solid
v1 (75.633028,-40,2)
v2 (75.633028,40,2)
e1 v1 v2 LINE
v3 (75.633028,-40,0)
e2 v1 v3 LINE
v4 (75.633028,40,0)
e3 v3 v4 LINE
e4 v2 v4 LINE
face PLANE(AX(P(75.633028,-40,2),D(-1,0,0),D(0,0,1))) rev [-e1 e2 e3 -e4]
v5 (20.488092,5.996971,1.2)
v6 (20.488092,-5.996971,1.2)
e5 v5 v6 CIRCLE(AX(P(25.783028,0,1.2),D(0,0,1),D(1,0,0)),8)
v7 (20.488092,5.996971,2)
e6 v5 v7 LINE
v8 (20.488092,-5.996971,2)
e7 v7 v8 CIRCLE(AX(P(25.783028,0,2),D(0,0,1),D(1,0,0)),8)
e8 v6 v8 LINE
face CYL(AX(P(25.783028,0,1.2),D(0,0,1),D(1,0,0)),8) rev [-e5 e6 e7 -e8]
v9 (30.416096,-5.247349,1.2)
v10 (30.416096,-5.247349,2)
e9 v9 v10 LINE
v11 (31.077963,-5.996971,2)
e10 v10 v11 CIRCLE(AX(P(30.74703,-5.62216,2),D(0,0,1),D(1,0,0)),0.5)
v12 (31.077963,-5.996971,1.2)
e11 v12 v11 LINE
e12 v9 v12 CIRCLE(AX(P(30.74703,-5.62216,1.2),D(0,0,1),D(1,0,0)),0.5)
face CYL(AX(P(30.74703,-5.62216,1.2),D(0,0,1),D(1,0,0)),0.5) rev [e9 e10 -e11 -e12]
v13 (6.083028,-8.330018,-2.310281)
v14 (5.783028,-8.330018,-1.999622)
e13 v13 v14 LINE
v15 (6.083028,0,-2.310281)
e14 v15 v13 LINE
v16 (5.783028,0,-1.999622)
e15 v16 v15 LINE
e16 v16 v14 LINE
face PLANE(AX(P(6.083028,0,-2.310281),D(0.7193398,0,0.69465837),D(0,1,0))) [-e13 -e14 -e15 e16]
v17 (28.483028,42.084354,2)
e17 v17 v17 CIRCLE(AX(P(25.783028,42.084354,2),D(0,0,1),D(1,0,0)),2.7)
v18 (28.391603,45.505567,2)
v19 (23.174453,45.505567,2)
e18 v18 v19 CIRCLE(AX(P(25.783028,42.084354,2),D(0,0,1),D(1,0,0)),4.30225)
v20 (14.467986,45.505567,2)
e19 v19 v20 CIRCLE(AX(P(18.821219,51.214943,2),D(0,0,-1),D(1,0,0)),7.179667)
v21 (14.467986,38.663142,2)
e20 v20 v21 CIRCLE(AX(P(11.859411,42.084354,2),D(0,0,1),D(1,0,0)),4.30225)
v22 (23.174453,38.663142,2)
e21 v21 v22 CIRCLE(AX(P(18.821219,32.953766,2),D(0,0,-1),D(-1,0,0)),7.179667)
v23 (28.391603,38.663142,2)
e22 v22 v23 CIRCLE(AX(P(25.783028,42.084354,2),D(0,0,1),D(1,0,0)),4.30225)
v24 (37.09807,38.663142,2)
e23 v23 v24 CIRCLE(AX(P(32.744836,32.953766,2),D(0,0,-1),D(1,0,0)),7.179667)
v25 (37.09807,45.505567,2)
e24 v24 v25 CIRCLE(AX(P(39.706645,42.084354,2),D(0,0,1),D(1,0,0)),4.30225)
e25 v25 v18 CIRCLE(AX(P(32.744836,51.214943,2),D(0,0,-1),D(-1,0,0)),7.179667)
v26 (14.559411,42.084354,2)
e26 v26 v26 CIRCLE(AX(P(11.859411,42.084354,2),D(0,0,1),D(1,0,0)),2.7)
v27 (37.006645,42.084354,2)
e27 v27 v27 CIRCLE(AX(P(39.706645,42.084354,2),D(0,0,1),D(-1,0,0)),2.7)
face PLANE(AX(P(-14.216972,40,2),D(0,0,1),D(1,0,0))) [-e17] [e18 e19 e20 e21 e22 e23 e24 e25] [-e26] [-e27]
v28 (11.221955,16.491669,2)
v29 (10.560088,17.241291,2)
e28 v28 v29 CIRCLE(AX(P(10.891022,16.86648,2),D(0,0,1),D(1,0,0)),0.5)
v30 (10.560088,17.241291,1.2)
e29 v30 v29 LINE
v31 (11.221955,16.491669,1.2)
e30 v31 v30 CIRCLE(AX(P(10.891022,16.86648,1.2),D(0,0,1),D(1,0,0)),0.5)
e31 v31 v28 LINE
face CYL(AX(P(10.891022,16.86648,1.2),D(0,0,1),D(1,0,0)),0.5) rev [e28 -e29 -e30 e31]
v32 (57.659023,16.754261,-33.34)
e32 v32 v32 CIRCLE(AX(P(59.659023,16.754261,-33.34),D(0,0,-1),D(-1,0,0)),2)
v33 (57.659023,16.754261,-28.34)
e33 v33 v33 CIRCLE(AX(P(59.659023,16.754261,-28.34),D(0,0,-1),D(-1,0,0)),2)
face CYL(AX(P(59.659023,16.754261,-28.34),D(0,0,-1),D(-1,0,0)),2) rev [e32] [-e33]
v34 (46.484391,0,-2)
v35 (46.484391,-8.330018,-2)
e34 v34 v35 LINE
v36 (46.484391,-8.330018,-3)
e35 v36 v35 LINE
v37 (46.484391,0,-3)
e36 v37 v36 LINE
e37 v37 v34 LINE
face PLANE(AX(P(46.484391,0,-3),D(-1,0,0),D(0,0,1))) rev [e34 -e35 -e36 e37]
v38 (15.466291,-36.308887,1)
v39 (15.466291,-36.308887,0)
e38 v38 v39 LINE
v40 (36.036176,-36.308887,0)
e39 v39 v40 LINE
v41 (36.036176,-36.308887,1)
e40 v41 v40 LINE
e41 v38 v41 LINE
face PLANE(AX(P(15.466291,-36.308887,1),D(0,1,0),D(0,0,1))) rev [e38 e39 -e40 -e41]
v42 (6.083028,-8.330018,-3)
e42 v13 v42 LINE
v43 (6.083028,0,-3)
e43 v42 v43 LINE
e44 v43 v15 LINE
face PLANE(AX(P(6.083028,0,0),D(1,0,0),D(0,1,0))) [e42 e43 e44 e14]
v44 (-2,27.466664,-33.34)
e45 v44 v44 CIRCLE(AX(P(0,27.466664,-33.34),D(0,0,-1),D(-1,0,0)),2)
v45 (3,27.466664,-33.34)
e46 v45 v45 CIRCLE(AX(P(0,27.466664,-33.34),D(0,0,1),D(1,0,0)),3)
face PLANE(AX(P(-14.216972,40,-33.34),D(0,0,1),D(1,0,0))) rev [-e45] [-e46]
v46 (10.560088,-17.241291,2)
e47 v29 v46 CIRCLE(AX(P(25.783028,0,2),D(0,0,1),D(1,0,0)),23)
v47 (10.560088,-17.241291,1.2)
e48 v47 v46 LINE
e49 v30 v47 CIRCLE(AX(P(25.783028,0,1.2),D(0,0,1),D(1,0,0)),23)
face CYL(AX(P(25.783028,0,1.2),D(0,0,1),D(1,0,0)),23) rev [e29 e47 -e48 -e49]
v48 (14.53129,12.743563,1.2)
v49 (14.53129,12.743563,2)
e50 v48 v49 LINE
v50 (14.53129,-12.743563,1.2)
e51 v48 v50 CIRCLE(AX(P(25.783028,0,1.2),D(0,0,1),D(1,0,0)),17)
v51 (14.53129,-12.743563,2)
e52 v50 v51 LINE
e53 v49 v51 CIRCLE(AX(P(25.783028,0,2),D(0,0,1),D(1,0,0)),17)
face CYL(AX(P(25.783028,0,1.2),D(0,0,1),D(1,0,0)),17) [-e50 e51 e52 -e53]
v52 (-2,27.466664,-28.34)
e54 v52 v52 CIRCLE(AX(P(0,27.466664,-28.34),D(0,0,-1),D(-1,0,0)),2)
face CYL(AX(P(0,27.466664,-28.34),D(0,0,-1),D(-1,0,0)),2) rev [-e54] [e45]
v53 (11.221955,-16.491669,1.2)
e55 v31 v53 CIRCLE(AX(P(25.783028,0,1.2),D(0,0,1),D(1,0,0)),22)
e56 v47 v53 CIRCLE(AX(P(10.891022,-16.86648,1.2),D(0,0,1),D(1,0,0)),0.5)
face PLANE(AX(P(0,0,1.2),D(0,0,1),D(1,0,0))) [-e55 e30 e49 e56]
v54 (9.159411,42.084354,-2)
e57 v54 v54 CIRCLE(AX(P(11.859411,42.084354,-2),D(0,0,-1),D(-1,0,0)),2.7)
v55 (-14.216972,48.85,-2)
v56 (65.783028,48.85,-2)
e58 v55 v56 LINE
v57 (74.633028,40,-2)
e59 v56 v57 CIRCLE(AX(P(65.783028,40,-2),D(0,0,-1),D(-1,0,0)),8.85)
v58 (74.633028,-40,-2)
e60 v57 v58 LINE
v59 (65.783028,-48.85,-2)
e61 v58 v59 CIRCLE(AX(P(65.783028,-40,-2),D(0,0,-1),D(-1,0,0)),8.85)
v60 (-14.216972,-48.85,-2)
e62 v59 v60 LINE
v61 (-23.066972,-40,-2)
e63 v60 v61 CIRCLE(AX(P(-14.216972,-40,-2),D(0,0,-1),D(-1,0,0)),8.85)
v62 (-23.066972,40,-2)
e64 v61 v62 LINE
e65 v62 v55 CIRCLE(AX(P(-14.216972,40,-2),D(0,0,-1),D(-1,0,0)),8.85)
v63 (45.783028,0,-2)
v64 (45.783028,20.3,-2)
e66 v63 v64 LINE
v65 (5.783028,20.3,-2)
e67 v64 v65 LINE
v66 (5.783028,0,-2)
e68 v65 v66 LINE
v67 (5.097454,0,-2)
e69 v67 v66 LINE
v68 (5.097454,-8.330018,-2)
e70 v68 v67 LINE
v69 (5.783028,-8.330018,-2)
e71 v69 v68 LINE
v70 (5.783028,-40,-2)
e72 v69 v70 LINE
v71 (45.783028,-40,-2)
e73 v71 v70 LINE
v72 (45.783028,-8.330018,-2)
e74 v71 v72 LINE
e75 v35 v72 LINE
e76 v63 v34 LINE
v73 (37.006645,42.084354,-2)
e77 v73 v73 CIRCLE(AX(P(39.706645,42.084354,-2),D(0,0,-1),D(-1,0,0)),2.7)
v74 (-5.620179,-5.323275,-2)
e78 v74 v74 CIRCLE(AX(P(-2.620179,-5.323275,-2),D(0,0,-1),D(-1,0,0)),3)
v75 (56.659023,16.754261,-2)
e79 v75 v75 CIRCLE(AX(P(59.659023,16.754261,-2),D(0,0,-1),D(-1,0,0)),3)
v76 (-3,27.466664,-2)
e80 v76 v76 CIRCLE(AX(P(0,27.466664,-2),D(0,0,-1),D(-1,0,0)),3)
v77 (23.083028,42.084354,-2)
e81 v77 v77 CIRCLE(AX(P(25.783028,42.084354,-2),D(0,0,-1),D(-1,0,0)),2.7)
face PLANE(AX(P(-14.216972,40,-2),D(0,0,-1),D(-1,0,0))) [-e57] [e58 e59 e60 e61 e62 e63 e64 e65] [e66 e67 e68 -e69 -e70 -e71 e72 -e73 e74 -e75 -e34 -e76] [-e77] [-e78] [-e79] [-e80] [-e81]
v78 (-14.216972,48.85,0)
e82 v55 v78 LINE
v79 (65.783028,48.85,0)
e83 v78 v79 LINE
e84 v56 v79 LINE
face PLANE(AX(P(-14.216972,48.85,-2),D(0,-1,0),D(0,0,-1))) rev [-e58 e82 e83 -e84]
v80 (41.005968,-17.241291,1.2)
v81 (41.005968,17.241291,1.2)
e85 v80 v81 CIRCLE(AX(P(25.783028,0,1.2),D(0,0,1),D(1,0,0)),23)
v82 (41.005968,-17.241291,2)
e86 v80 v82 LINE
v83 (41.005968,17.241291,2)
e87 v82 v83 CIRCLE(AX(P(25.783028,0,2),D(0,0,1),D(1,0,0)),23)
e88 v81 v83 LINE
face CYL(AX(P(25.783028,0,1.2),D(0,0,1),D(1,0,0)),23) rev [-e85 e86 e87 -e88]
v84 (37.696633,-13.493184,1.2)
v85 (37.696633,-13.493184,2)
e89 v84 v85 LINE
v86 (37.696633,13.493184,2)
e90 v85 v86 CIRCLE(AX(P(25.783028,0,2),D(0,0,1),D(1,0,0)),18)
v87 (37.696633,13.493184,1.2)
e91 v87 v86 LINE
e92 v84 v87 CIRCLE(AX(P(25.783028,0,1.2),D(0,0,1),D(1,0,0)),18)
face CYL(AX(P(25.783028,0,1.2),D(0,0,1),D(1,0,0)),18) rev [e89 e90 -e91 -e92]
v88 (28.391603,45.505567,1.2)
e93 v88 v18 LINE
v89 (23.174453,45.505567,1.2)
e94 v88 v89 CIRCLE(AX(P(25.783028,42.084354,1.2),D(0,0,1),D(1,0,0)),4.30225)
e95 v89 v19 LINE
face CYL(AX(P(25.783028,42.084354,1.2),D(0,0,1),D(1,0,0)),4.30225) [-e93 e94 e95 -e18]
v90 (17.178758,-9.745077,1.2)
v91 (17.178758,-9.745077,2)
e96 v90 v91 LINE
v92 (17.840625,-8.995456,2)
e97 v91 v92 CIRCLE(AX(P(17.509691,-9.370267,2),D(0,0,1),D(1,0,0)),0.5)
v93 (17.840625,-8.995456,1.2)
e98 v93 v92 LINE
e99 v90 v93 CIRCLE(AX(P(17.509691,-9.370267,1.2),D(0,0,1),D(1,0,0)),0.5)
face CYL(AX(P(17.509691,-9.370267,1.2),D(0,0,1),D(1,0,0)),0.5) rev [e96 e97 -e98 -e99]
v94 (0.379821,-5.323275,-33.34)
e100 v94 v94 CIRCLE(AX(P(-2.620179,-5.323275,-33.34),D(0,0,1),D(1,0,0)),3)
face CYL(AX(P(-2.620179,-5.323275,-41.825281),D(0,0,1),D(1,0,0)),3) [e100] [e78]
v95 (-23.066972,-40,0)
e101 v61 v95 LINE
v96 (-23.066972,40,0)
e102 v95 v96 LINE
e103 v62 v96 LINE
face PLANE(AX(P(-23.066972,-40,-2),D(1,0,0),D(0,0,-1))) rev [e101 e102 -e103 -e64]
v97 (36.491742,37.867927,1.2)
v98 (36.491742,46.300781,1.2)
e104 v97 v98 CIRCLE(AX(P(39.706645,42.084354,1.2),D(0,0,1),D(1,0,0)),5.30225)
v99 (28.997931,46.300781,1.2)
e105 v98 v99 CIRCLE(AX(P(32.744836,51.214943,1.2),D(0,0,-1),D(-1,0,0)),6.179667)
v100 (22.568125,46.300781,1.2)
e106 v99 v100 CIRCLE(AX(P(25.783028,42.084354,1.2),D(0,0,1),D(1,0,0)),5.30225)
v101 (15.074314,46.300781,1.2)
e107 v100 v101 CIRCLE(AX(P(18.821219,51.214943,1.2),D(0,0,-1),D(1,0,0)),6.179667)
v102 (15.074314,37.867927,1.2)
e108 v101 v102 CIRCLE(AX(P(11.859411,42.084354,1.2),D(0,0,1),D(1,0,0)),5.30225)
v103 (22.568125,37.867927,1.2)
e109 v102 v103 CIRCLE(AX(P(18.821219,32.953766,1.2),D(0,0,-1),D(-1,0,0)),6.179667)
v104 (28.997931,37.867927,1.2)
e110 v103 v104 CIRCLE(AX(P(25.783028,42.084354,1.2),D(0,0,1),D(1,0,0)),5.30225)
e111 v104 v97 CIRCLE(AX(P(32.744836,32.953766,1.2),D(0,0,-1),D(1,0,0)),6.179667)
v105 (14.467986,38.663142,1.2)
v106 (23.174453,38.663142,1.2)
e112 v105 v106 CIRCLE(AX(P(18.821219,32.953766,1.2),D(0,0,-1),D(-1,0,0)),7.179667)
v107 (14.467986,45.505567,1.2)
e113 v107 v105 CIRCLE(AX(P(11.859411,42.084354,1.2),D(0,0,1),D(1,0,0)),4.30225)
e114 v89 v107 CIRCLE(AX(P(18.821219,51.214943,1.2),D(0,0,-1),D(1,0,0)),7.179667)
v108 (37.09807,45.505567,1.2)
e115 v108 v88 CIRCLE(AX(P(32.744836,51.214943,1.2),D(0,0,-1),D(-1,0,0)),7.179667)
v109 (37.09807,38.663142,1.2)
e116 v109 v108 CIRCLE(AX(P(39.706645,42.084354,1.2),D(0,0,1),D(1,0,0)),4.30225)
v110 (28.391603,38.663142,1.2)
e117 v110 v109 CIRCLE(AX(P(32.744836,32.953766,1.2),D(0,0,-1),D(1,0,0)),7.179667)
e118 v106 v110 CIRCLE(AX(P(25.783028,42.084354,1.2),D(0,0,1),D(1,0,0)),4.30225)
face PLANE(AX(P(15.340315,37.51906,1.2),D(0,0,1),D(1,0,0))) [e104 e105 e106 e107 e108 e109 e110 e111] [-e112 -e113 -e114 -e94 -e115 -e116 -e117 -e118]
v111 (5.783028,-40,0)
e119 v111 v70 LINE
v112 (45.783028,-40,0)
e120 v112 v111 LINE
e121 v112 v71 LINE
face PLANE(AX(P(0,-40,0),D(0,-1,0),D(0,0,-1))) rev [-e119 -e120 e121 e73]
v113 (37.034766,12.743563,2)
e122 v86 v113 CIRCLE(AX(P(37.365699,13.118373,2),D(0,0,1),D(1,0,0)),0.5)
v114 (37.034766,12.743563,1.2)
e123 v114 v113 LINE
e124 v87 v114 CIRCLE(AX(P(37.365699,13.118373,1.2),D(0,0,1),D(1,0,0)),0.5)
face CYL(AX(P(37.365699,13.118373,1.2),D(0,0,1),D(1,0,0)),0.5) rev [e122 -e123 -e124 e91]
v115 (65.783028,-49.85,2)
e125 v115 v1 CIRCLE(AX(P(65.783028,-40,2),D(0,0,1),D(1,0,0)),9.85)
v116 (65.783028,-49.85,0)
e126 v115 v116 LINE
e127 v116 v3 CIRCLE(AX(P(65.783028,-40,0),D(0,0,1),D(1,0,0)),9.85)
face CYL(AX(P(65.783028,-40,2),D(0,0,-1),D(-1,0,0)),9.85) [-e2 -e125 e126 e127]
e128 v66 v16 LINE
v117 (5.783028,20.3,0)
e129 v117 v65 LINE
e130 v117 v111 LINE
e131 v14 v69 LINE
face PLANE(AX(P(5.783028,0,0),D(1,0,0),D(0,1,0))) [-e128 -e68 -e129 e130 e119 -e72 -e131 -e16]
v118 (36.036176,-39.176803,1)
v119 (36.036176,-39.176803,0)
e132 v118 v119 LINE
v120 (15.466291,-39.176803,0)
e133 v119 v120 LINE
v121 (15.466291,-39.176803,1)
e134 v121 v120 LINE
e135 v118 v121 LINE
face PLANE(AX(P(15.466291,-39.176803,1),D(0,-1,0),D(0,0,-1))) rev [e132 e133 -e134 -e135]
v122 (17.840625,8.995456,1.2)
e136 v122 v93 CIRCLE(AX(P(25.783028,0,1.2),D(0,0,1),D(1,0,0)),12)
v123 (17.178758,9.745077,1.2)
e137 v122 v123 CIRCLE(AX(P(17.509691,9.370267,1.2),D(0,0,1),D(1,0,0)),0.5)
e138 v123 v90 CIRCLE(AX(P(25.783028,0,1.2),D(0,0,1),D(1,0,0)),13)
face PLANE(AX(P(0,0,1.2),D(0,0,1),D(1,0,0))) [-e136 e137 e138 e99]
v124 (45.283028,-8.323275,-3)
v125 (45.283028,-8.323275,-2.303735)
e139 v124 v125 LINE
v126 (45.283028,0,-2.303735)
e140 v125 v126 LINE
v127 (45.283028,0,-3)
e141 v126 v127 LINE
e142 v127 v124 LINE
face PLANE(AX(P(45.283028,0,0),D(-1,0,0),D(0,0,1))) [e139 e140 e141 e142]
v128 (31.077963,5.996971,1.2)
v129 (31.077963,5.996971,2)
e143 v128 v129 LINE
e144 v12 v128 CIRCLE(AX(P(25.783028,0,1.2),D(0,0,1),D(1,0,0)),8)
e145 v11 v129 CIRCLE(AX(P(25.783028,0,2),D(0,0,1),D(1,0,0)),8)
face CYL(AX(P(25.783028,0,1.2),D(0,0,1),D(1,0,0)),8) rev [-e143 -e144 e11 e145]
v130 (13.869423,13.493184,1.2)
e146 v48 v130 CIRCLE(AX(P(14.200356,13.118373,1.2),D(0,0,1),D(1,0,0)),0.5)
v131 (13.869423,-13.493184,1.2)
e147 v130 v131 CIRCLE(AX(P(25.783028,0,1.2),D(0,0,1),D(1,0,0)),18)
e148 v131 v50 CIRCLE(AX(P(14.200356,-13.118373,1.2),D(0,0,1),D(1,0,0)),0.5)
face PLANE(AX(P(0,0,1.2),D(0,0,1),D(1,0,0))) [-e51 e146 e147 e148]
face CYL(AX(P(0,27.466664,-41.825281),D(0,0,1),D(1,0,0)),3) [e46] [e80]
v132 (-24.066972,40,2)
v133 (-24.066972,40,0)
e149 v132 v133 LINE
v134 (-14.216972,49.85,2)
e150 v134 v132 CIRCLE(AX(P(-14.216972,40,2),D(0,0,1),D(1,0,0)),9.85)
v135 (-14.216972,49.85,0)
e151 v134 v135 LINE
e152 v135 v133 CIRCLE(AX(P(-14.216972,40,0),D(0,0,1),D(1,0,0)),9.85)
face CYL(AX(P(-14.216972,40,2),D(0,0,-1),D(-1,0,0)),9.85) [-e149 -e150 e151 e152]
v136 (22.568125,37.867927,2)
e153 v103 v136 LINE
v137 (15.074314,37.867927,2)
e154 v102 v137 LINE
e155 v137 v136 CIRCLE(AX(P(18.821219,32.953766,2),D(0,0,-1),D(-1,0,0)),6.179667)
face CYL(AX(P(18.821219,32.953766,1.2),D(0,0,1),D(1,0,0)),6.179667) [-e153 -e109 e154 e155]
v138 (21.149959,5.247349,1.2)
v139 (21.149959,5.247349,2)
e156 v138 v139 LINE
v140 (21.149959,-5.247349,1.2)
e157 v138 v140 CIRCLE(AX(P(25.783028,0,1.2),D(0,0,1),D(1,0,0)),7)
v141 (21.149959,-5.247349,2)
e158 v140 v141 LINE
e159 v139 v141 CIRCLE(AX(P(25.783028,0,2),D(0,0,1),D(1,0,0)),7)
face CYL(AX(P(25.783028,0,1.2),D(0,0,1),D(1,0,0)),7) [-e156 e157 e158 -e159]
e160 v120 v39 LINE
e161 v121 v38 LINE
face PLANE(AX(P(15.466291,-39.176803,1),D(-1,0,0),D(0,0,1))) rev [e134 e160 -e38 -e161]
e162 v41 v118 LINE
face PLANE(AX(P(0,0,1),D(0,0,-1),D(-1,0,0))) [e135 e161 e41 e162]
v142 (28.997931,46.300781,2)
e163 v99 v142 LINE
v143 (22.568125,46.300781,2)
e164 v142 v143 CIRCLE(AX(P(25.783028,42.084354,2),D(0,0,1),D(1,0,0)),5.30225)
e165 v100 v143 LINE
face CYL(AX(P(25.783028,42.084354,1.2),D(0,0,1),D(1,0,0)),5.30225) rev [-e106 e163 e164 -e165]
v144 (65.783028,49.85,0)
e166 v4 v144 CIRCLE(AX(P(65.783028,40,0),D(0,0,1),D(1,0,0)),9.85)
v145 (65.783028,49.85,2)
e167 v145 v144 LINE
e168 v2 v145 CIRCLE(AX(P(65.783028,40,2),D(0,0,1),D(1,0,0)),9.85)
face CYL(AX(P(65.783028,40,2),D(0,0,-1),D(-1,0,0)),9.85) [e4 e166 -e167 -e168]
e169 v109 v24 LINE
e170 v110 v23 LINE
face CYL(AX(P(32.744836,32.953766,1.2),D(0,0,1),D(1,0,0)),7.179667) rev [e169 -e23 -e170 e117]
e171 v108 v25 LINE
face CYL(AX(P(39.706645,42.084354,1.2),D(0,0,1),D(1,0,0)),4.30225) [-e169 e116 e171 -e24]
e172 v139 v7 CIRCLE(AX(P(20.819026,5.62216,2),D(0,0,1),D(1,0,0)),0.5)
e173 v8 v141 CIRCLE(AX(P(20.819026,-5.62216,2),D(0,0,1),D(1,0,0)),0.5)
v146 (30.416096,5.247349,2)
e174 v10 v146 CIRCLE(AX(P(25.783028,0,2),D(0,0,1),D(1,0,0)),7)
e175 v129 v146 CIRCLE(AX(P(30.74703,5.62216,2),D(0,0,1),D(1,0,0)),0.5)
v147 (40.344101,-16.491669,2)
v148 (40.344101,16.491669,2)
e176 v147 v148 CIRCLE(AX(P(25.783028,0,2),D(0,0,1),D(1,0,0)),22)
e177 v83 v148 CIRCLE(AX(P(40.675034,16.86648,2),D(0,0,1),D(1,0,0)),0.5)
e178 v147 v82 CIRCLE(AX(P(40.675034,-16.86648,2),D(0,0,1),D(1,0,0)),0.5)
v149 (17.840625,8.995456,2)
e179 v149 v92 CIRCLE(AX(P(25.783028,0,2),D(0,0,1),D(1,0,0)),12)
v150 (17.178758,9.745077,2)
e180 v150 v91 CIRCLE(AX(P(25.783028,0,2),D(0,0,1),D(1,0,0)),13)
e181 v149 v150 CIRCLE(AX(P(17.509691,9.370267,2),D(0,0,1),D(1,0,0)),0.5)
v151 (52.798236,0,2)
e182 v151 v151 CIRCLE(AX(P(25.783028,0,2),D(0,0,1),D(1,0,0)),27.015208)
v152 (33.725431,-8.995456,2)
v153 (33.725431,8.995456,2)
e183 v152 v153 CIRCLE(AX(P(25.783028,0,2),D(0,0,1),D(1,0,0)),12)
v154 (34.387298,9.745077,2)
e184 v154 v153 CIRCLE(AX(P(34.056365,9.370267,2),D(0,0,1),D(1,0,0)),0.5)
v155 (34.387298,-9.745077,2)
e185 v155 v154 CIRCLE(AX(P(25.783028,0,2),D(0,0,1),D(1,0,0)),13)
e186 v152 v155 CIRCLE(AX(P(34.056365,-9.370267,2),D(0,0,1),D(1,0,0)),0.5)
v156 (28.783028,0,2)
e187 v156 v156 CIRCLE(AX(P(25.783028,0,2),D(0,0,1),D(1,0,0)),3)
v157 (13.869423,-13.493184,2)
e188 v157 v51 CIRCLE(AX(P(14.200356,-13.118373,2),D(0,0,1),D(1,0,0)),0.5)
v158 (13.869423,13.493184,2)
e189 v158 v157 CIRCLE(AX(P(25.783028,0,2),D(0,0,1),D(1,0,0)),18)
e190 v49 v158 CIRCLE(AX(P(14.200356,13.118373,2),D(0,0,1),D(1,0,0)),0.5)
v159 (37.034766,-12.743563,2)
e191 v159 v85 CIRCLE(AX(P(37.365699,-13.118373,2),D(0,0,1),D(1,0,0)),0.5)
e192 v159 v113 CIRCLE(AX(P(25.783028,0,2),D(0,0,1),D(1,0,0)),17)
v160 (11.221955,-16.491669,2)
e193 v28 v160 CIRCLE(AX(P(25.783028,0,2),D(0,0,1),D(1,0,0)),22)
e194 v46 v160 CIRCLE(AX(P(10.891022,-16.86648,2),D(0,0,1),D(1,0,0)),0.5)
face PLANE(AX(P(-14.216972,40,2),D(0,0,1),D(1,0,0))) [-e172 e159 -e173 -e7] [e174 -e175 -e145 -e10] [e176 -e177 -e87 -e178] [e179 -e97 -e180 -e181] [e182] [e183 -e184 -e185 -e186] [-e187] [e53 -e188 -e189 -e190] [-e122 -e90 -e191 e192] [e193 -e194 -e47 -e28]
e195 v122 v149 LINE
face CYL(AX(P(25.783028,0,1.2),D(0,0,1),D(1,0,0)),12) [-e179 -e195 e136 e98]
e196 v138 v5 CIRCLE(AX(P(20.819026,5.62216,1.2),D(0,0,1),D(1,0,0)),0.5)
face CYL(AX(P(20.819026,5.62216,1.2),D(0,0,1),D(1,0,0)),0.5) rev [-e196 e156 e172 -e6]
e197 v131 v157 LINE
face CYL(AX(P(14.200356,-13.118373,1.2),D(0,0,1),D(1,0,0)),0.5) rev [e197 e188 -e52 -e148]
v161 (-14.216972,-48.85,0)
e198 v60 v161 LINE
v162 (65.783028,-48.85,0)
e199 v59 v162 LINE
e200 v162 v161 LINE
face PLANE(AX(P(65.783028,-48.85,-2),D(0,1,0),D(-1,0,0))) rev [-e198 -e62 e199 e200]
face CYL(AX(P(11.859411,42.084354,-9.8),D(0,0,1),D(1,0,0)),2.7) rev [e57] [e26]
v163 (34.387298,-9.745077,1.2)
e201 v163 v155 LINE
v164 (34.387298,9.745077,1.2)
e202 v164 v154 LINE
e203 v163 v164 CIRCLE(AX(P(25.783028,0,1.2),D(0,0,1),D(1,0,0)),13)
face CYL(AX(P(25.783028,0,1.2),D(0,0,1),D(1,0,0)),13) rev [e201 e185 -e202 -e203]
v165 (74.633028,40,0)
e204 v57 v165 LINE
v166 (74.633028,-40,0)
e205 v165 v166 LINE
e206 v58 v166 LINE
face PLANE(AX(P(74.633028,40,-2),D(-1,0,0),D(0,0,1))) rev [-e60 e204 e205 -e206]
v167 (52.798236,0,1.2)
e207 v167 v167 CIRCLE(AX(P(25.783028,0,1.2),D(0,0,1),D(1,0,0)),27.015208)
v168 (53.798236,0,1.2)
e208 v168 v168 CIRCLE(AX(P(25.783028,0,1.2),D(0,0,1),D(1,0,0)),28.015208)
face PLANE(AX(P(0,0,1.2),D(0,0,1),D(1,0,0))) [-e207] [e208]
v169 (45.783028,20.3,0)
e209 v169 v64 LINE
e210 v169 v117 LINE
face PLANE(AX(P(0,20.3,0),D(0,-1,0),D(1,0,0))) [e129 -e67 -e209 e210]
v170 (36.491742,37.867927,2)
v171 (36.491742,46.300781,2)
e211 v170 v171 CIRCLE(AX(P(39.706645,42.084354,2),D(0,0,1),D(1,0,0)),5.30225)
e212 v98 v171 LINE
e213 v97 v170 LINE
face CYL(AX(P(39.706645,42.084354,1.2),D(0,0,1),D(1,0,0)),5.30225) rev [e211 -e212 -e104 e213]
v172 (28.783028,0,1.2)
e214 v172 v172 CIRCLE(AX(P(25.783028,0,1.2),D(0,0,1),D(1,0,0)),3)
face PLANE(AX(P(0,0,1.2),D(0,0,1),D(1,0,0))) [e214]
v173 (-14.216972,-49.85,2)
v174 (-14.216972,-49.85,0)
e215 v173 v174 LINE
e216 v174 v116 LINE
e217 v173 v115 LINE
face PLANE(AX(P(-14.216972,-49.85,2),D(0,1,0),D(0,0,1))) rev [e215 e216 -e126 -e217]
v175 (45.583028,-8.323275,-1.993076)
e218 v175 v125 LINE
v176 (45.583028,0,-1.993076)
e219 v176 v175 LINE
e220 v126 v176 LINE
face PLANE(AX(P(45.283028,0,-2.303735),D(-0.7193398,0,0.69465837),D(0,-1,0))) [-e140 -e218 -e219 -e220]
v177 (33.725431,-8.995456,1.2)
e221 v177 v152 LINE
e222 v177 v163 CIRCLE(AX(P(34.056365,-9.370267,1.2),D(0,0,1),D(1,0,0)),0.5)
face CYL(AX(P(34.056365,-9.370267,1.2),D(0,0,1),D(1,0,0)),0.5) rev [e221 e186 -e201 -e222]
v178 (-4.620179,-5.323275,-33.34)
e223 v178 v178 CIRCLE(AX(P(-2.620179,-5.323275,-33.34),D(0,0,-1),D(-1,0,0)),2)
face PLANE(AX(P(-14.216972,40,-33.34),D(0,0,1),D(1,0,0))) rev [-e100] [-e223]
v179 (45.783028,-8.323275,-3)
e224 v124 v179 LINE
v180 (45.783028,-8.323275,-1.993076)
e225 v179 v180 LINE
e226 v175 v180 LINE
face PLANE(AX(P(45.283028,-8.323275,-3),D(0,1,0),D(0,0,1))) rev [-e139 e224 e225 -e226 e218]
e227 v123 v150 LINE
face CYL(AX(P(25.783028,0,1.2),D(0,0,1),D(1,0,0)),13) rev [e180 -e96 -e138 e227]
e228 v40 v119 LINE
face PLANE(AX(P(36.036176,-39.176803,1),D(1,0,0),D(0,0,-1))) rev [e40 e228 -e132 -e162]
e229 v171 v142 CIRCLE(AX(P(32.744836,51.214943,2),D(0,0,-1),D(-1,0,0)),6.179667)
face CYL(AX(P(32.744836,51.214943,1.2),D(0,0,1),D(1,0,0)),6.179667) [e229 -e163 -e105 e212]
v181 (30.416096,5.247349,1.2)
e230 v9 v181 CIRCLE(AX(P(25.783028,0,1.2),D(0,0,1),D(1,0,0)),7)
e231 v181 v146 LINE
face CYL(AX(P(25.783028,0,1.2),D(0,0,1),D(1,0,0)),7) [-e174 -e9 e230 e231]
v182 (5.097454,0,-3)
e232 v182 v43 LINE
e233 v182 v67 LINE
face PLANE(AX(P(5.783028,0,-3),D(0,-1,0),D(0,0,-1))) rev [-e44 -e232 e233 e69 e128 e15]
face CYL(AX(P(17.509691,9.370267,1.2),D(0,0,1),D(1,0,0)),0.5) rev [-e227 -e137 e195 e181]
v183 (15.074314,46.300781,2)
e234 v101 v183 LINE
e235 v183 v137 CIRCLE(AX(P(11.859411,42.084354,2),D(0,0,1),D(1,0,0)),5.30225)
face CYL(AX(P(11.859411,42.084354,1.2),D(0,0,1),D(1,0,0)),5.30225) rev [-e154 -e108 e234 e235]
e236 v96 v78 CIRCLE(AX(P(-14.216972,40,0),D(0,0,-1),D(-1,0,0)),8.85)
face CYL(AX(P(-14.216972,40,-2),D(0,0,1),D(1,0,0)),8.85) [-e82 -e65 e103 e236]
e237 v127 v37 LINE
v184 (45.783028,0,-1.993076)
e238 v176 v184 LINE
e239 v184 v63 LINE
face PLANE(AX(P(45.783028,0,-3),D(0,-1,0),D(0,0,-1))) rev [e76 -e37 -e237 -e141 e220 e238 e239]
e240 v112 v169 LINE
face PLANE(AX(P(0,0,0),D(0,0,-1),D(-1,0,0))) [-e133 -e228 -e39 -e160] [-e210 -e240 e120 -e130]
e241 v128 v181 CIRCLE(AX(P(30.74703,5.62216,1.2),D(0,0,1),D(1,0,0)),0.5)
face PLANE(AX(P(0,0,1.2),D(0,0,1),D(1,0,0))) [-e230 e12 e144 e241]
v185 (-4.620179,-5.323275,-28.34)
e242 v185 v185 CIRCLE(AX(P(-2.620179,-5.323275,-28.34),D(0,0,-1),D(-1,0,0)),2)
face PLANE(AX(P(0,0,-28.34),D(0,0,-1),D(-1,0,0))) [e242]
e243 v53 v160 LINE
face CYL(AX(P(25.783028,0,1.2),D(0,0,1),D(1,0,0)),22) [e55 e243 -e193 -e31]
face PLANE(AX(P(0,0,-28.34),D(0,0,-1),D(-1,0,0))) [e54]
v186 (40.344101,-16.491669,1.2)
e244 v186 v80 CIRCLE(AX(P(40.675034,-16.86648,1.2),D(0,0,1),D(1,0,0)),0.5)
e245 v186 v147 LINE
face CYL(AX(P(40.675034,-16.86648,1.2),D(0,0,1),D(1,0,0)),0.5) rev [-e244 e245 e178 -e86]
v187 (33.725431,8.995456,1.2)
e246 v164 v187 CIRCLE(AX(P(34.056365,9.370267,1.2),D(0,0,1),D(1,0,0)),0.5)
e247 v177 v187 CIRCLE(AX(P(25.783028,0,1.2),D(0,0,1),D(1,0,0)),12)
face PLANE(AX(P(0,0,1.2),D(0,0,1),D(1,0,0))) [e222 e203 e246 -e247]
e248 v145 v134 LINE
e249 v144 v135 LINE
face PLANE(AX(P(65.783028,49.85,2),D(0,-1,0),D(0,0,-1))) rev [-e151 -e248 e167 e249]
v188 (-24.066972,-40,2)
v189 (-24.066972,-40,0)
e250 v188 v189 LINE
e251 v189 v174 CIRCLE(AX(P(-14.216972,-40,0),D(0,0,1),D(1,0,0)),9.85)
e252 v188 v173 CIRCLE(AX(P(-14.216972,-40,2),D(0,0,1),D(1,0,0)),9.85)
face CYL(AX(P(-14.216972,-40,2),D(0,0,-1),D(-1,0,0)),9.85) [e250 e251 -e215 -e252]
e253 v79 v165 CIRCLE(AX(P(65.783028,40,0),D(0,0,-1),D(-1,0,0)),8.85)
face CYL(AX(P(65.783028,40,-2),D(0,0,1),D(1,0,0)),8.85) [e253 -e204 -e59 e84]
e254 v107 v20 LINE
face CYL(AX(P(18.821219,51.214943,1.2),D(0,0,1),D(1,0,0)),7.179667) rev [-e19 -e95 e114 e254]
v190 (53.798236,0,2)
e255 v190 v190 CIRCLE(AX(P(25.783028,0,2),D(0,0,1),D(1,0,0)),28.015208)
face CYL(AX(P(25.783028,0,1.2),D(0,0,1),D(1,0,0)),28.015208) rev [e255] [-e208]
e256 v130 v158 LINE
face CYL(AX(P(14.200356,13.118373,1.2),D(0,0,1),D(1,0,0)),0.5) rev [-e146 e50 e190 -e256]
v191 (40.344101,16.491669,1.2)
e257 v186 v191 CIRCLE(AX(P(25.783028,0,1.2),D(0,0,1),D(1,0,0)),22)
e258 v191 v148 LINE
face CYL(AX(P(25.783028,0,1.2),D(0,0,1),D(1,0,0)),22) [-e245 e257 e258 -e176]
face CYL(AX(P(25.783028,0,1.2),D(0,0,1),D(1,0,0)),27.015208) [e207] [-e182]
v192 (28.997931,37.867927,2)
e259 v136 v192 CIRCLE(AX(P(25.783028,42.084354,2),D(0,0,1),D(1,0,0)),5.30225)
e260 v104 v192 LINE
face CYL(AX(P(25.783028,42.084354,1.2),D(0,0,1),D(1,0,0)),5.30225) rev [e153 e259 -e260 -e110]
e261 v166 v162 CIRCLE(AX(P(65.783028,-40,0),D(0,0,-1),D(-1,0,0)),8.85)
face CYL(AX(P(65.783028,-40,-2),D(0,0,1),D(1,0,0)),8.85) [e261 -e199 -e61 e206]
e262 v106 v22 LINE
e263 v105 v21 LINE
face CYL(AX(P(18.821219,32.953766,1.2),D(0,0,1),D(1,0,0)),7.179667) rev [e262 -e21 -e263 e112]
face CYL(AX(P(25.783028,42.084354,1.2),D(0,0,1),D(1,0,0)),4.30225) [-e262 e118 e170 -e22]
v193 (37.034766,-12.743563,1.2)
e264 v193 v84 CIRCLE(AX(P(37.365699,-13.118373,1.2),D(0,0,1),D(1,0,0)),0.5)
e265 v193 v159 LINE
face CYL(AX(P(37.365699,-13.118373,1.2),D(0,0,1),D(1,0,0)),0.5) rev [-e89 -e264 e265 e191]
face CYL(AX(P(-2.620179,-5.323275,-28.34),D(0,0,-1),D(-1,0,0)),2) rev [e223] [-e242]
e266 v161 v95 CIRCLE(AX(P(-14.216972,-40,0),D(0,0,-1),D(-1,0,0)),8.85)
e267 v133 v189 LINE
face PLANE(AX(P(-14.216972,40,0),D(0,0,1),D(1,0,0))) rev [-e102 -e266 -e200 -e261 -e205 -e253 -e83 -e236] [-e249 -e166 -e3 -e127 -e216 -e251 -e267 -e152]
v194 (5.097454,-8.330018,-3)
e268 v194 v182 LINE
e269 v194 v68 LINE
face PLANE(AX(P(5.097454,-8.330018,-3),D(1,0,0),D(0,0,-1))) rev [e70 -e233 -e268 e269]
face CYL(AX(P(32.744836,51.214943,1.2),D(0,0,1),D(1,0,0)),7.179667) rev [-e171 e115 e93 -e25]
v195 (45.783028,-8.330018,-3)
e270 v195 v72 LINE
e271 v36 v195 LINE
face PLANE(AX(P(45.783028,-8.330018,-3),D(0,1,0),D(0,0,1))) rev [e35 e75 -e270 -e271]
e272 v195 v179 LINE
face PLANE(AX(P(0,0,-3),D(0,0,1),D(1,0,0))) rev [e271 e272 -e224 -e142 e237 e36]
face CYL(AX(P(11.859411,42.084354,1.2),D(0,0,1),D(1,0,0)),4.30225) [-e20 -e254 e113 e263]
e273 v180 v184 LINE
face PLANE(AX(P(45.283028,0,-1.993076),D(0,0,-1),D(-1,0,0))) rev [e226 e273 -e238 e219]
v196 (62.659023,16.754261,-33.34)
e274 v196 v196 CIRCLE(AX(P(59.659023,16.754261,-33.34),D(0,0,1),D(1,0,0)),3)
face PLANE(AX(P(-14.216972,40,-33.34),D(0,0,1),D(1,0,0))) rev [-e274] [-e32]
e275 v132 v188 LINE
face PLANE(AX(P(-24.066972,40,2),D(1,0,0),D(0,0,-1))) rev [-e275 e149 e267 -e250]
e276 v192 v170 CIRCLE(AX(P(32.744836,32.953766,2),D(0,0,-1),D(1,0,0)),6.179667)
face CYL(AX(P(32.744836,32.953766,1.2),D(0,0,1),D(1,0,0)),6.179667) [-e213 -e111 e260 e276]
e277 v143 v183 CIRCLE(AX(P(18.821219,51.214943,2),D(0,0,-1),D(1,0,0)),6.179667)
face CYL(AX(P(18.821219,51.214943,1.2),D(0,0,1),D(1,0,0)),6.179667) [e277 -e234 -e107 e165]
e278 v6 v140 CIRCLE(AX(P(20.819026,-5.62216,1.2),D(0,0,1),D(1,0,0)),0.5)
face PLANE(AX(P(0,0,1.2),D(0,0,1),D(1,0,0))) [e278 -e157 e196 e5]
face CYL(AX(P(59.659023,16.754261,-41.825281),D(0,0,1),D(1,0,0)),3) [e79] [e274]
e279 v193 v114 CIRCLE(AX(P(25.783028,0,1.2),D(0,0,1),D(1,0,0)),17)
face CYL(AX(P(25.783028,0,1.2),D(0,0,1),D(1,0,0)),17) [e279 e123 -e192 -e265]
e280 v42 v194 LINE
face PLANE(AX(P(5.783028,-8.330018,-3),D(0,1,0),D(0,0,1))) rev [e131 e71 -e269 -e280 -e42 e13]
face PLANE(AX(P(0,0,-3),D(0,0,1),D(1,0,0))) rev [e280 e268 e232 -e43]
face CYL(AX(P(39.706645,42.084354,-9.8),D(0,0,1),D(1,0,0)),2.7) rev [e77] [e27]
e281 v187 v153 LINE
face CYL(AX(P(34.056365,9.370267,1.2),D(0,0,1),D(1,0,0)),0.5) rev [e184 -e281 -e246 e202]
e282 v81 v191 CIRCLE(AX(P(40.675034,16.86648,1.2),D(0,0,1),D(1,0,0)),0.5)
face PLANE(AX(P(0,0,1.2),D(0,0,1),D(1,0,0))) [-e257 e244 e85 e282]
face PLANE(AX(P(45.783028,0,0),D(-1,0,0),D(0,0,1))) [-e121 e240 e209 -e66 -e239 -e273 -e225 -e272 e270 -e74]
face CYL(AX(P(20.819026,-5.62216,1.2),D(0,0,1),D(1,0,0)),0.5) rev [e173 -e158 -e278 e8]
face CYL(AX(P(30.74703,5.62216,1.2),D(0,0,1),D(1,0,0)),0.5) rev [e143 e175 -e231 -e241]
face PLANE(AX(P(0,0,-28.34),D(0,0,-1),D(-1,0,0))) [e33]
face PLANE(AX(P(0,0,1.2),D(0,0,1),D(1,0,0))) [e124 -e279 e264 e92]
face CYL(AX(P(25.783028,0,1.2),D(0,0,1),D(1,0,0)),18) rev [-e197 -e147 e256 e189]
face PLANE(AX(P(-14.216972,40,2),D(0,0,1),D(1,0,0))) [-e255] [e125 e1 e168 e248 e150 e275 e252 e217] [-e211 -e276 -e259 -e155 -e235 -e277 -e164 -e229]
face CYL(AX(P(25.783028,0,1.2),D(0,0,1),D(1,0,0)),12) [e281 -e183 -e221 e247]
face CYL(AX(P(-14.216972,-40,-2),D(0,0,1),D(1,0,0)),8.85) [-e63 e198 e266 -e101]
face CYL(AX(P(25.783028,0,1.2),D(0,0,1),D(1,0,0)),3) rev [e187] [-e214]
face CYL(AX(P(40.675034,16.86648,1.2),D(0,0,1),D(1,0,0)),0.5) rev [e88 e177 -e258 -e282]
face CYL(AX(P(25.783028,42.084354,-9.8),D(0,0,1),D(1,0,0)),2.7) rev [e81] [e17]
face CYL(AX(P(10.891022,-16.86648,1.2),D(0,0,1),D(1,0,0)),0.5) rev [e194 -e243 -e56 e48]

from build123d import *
from OCP.BRepFilletAPI import BRepFilletAPI_MakeChamfer

# Parameters (mm, degrees)
SALIENTE_EXTRUIR1_DEPTH = 2
SALIENTE_EXTRUIR2_DEPTH = 2
CORTAR_EXTRUIR1_DEPTH   = 2
CROQUIS5_R              = 28.015207884
CROQUIS5_R_2            = 27.015207884
CROQUIS5_R_3            = 3
CORTAR_EXTRUIR2_DEPTH   = 0.8
CROQUIS6_R              = 2.7
CORTAR_EXTRUIR3_DEPTH   = 11.8
CROQUIS7_R              = 3
SALIENTE_EXTRUIR3_DEPTH = 31.34
CROQUIS8_R              = 2
CORTAR_EXTRUIR4_DEPTH   = 5
CROQUIS9_W              = 20.569885585
CROQUIS9_H              = 2.86791674
CORTAR_EXTRUIR5_DEPTH   = 1
CROQUIS10_W             = 0.685574001
CROQUIS10_H             = 8.330017526
CROQUIS10_W_2           = 0.70136351
SALIENTE_EXTRUIR4_DEPTH = 1
CROQUIS11_W             = 1.000377771
CROQUIS11_H             = 8.330017526
SALIENTE_EXTRUIR5_DEPTH = 0.3
CROQUIS12_W             = 1.006924042
CROQUIS12_H             = 8.323274802
SALIENTE_EXTRUIR6_DEPTH = 0.5
CHAFL_N1_SIZE           = 0.310659094
CHAFL_N1_SIZE_2         = 0.3
CORTAR_EXTRUIR6_DEPTH   = 0.8


with BuildPart() as part:
    # Croquis1 → Saliente-Extruir1 (new body)
    with BuildSketch(Plane.XY):
        with BuildLine():
            Line((-24.066972173, 40), (-24.066972173, -40))
            ThreePointArc((-24.066972173, -40), (-21.181973968, -46.965001795), (-14.216972173, -49.85))
            Line((-14.216972173, -49.85), (65.783027827, -49.85))
            ThreePointArc((65.783027827, -49.85), (72.748029622, -46.965001795), (75.633027827, -40))
            Line((75.633027827, -40), (75.633027827, 40))
            ThreePointArc((75.633027827, 40), (72.748029622, 46.965001795), (65.783027827, 49.85))
            Line((65.783027827, 49.85), (-14.216972173, 49.85))
            ThreePointArc((-14.216972173, 49.85), (-21.181973968, 46.965001795), (-24.066972173, 40))
        make_face()
    extrude(amount=SALIENTE_EXTRUIR1_DEPTH)

    # Croquis2 → Saliente-Extruir2 (add)
    with BuildSketch(Plane(origin=(0, 0, 0), x_dir=(-1, 0, 0), z_dir=(0, 0, -1))):
        with BuildLine():
            Line((14.216972173, 48.85), (-65.783027827, 48.85))
            ThreePointArc((-65.783027827, 48.85), (-72.040922841, 46.257895014), (-74.633027827, 40))
            Line((-74.633027827, 40), (-74.633027827, -40))
            ThreePointArc((-74.633027827, -40), (-72.040922841, -46.257895014), (-65.783027827, -48.85))
            Line((-65.783027827, -48.85), (14.216972173, -48.85))
            ThreePointArc((14.216972173, -48.85), (20.474867186, -46.257895014), (23.066972173, -40))
            Line((23.066972173, -40), (23.066972173, 40))
            ThreePointArc((23.066972173, 40), (20.474867186, 46.257895014), (14.216972173, 48.85))
        make_face()
    extrude(amount=SALIENTE_EXTRUIR2_DEPTH)

    # Croquis3 → Cortar-Extruir1 (cut)
    with BuildSketch(Plane(origin=(0, 0, -2), x_dir=(-1, 0, 0), z_dir=(0, 0, -1))):
        Polygon((-5.783027827, 0), (-5.783027827, -40), (-45.783027827, -40), (-45.783027827, 0), (-45.783027827, 20.3), (-5.783027827, 20.3), align=None)
    extrude(amount=-CORTAR_EXTRUIR1_DEPTH, mode=Mode.SUBTRACT)

    # Croquis5 → Cortar-Extruir2 (cut)
    # profile 1 of 10: a face of its own
    with BuildSketch(Plane.XY.offset(2)):
        with Locations((25.783027827, 0)):
            Circle(CROQUIS5_R)
        with Locations((25.783027827, 0)):
            Circle(CROQUIS5_R_2, mode=Mode.SUBTRACT)
    # profile 2 of 10: a face of its own
    with BuildSketch(Plane.XY.offset(2)):
        with Locations((25.783027827, 0)):
            Circle(CROQUIS5_R_3)
    # profile 3 of 10: a face of its own
    with BuildSketch(Plane.XY.offset(2)):
        with BuildLine():
            ThreePointArc((40.344100587, -16.491669415), (47.783027827, 0), (40.344100587, 16.491669415))
            ThreePointArc((40.344100587, 16.491669415), (40.30022339, 17.197413555), (41.00596753, 17.241290752))
            ThreePointArc((41.00596753, 17.241290752), (48.783027827, 0), (41.00596753, -17.241290752))
            ThreePointArc((41.00596753, -17.241290752), (40.30022339, -17.197413555), (40.344100587, -16.491669415))
        make_face()
    # profile 4 of 10: a face of its own
    with BuildSketch(Plane.XY.offset(2)):
        with BuildLine():
            ThreePointArc((37.034765869, -12.74356273), (42.783027827, 0), (37.034765869, 12.74356273))
            ThreePointArc((37.034765869, 12.74356273), (36.990888672, 13.44930687), (37.696632812, 13.493184067))
            ThreePointArc((37.696632812, 13.493184067), (43.783027827, 0), (37.696632812, -13.493184067))
            ThreePointArc((37.696632812, -13.493184067), (36.990888672, -13.44930687), (37.034765869, -12.74356273))
        make_face()
    # profile 5 of 10: a face of its own
    with BuildSketch(Plane.XY.offset(2)):
        with BuildLine():
            ThreePointArc((33.725431151, -8.995456045), (37.783027827, 0), (33.725431151, 8.995456045))
            ThreePointArc((33.725431151, 8.995456045), (33.681553954, 9.701200185), (34.387298094, 9.745077382))
            ThreePointArc((34.387298094, 9.745077382), (38.783027827, 0), (34.387298094, -9.745077382))
            ThreePointArc((34.387298094, -9.745077382), (33.681553954, -9.701200185), (33.725431151, -8.995456045))
        make_face()
    # profile 6 of 10: a face of its own
    with BuildSketch(Plane.XY.offset(2)):
        with BuildLine():
            ThreePointArc((30.416096432, -5.247349359), (32.783027827, 0), (30.416096432, 5.247349359))
            ThreePointArc((30.416096432, 5.247349359), (30.372219236, 5.9530935), (31.077963376, 5.996970696))
            ThreePointArc((31.077963376, 5.996970696), (33.783027827, 0), (31.077963376, -5.996970696))
            ThreePointArc((31.077963376, -5.996970696), (30.372219236, -5.9530935), (30.416096432, -5.247349359))
        make_face()
    # profile 7 of 10: a face of its own
    with BuildSketch(Plane.XY.offset(2)):
        with BuildLine():
            ThreePointArc((20.488092278, 5.996970696), (17.783027827, 0), (20.488092278, -5.996970696))
            ThreePointArc((20.488092278, -5.996970696), (21.193836419, -5.9530935), (21.149959222, -5.247349359))
            ThreePointArc((21.149959222, -5.247349359), (18.783027827, 0), (21.149959222, 5.247349359))
            ThreePointArc((21.149959222, 5.247349359), (21.193836419, 5.9530935), (20.488092278, 5.996970696))
        make_face()
    # profile 8 of 10: a face of its own
    with BuildSketch(Plane.XY.offset(2)):
        with BuildLine():
            ThreePointArc((17.17875756, 9.745077382), (12.783027827, 0), (17.17875756, -9.745077382))
            ThreePointArc((17.17875756, -9.745077382), (17.884501701, -9.701200185), (17.840624504, -8.995456045))
            ThreePointArc((17.840624504, -8.995456045), (13.783027827, 0), (17.840624504, 8.995456045))
            ThreePointArc((17.840624504, 8.995456045), (17.884501701, 9.701200185), (17.17875756, 9.745077382))
        make_face()
    # profile 9 of 10: a face of its own
    with BuildSketch(Plane.XY.offset(2)):
        with BuildLine():
            ThreePointArc((13.869422842, 13.493184067), (7.783027827, 0), (13.869422842, -13.493184067))
            ThreePointArc((13.869422842, -13.493184067), (14.575166983, -13.44930687), (14.531289786, -12.74356273))
            ThreePointArc((14.531289786, -12.74356273), (8.783027827, 0), (14.531289786, 12.74356273))
            ThreePointArc((14.531289786, 12.74356273), (14.575166983, 13.44930687), (13.869422842, 13.493184067))
        make_face()
    # profile 10 of 10: a face of its own
    with BuildSketch(Plane.XY.offset(2)):
        with BuildLine():
            ThreePointArc((10.560088124, 17.241290752), (2.783027827, 0), (10.560088124, -17.241290752))
            ThreePointArc((10.560088124, -17.241290752), (11.265832264, -17.197413555), (11.221955068, -16.491669415))
            ThreePointArc((11.221955068, -16.491669415), (3.783027827, 0), (11.221955068, 16.491669415))
            ThreePointArc((11.221955068, 16.491669415), (11.265832264, 17.197413555), (10.560088124, 17.241290752))
        make_face()
    extrude(amount=-CORTAR_EXTRUIR2_DEPTH, mode=Mode.SUBTRACT)

    # Croquis6 → Cortar-Extruir3 (cut)
    with BuildSketch(Plane.XY.offset(2)):
        with Locations((25.783027827, 42.084354259)):
            Circle(CROQUIS6_R)
        with Locations(Location((39.706644574, 42.084354259, 0), (0, 0, 180))):
            Circle(CROQUIS6_R)
        with Locations((11.859411081, 42.084354259)):
            Circle(CROQUIS6_R)
    extrude(amount=-CORTAR_EXTRUIR3_DEPTH, mode=Mode.SUBTRACT)

    # Croquis7 → Saliente-Extruir3 (add)
    with BuildSketch(Plane(origin=(0, 0, -2), x_dir=(-1, 0, 0), z_dir=(0, 0, -1))):
        with Locations(Location((2.62017868, -5.323274802, 0), (0, 0, 180))):
            Circle(CROQUIS7_R)
        with Locations(Location((-59.659023373, 16.754261366, 0), (0, 0, 180))):
            Circle(CROQUIS7_R)
        with Locations(Location((0, 27.466663807, 0), (0, 0, 180))):
            Circle(CROQUIS7_R)
    extrude(amount=SALIENTE_EXTRUIR3_DEPTH)

    # Croquis8 → Cortar-Extruir4 (cut)
    with BuildSketch(Plane(origin=(0, 0, -33.34), x_dir=(-1, 0, 0), z_dir=(0, 0, -1))):
        with Locations((2.62017868, -5.323274802)):
            Circle(CROQUIS8_R)
        with Locations((0, 27.466663807)):
            Circle(CROQUIS8_R)
        with Locations((-59.659023373, 16.754261366)):
            Circle(CROQUIS8_R)
    extrude(amount=-CORTAR_EXTRUIR4_DEPTH, mode=Mode.SUBTRACT)

    # Croquis9 → Cortar-Extruir5 (cut)
    with BuildSketch(Plane(origin=(0, 0, 0), x_dir=(-1, 0, 0), z_dir=(0, 0, -1))):
        with Locations((-25.751233426, -37.742845004)):
            Rectangle(CROQUIS9_W, CROQUIS9_H)
    extrude(amount=-CORTAR_EXTRUIR5_DEPTH, mode=Mode.SUBTRACT)

    # Croquis10 → Saliente-Extruir4 (add)
    with BuildSketch(Plane(origin=(0, 0, -2), x_dir=(-1, 0, 0), z_dir=(0, 0, -1))):
        with Locations((-5.440240827, -4.165008763)):
            Rectangle(CROQUIS10_W, CROQUIS10_H)
        with Locations((-46.133709582, -4.165008763)):
            Rectangle(CROQUIS10_W_2, CROQUIS10_H)
    extrude(amount=SALIENTE_EXTRUIR4_DEPTH)

    # Croquis11 → Saliente-Extruir5 (add)
    with BuildSketch(Plane(origin=(5.783027827, 0, 0), x_dir=(0, 0, -1), z_dir=(1, 0, 0))):
        with Locations((2.499811114, -4.165008763)):
            Rectangle(CROQUIS11_W, CROQUIS11_H)
    extrude(amount=SALIENTE_EXTRUIR5_DEPTH)

    # Croquis12 → Saliente-Extruir6 (add)
    with BuildSketch(Plane.ZY.offset(-45.783027827)):
        with Locations((-2.496537979, -4.161637401)):
            Rectangle(CROQUIS12_W, CROQUIS12_H)
    extrude(amount=SALIENTE_EXTRUIR6_DEPTH)

    # Chaflán1
    chafl_n1_edges_1 = [part.edges().sort_by_distance(p)[0] for p in [
        (45.283027827, -4.161637401, -1.993075958),
    ]]
    chafl_n1_side_1 = [part.faces().sort_by_distance(p)[0] for p in [
        (45.283027827, -4.161637401, -1.999075958),
    ]]
    chafl_n1_edges_2 = [part.edges().sort_by_distance(p)[0] for p in [
        (6.083027827, -4.165008763, -1.999622229),
    ]]
    chafl_n1_side_2 = [part.faces().sort_by_distance(p)[0] for p in [
        (6.077027827, -4.165008763, -1.999622229),
    ]]
    chafl_n1 = BRepFilletAPI_MakeChamfer(part.part.solid().wrapped)
    for e in chafl_n1_edges_1:
        chafl_n1.Add(CHAFL_N1_SIZE - 0.0001, CHAFL_N1_SIZE_2 - 0.0001, e.wrapped, chafl_n1_side_1[0].wrapped)
    for e in chafl_n1_edges_2:
        chafl_n1.Add(CHAFL_N1_SIZE_2 - 0.0001, CHAFL_N1_SIZE - 0.0001, e.wrapped, chafl_n1_side_2[0].wrapped)
    add(Compound.cast(chafl_n1.Shape()), mode=Mode.REPLACE)  # a hair under: the kernel refuses the full size

    # Croquis13 → Cortar-Extruir6 (cut)
    with BuildSketch(Plane.XY.offset(2)):
        with BuildLine():
            ThreePointArc((15.07431414, 37.867927159), (18.821219454, 39.133432517), (22.568124768, 37.867927159))
            ThreePointArc((22.568124768, 37.867927159), (25.783027827, 36.782103872), (28.997930887, 37.867927159))
            ThreePointArc((28.997930887, 37.867927159), (32.7448362, 39.133432517), (36.491741514, 37.867927159))
            ThreePointArc((36.491741514, 37.867927159), (45.008894961, 42.084354259), (36.491741514, 46.300781358))
            ThreePointArc((36.491741514, 46.300781358), (32.7448362, 45.035276001), (28.997930887, 46.300781358))
            ThreePointArc((28.997930887, 46.300781358), (25.783027827, 47.386604646), (22.568124768, 46.300781358))
            ThreePointArc((22.568124768, 46.300781358), (18.821219454, 45.035276001), (15.07431414, 46.300781358))
            ThreePointArc((15.07431414, 46.300781358), (6.557160693, 42.084354259), (15.07431414, 37.867927159))
        make_face()
        with BuildLine():
            ThreePointArc((14.467986105, 45.505566725), (7.557160693, 42.084354259), (14.467986105, 38.663141793))
            ThreePointArc((14.467986105, 38.663141793), (18.821219454, 40.133432517), (23.174452803, 38.663141793))
            ThreePointArc((23.174452803, 38.663141793), (25.783027827, 37.782103872), (28.391602851, 38.663141793))
            ThreePointArc((28.391602851, 38.663141793), (32.7448362, 40.133432517), (37.09806955, 38.663141793))
            ThreePointArc((37.09806955, 38.663141793), (44.008894961, 42.084354259), (37.09806955, 45.505566725))
            ThreePointArc((37.09806955, 45.505566725), (32.7448362, 44.035276001), (28.391602851, 45.505566725))
            ThreePointArc((28.391602851, 45.505566725), (25.783027827, 46.386604646), (23.174452803, 45.505566725))
            ThreePointArc((23.174452803, 45.505566725), (18.821219454, 44.035276001), (14.467986105, 45.505566725))
        make_face(mode=Mode.SUBTRACT)
    extrude(amount=-CORTAR_EXTRUIR6_DEPTH, mode=Mode.SUBTRACT)


solid = part.part
